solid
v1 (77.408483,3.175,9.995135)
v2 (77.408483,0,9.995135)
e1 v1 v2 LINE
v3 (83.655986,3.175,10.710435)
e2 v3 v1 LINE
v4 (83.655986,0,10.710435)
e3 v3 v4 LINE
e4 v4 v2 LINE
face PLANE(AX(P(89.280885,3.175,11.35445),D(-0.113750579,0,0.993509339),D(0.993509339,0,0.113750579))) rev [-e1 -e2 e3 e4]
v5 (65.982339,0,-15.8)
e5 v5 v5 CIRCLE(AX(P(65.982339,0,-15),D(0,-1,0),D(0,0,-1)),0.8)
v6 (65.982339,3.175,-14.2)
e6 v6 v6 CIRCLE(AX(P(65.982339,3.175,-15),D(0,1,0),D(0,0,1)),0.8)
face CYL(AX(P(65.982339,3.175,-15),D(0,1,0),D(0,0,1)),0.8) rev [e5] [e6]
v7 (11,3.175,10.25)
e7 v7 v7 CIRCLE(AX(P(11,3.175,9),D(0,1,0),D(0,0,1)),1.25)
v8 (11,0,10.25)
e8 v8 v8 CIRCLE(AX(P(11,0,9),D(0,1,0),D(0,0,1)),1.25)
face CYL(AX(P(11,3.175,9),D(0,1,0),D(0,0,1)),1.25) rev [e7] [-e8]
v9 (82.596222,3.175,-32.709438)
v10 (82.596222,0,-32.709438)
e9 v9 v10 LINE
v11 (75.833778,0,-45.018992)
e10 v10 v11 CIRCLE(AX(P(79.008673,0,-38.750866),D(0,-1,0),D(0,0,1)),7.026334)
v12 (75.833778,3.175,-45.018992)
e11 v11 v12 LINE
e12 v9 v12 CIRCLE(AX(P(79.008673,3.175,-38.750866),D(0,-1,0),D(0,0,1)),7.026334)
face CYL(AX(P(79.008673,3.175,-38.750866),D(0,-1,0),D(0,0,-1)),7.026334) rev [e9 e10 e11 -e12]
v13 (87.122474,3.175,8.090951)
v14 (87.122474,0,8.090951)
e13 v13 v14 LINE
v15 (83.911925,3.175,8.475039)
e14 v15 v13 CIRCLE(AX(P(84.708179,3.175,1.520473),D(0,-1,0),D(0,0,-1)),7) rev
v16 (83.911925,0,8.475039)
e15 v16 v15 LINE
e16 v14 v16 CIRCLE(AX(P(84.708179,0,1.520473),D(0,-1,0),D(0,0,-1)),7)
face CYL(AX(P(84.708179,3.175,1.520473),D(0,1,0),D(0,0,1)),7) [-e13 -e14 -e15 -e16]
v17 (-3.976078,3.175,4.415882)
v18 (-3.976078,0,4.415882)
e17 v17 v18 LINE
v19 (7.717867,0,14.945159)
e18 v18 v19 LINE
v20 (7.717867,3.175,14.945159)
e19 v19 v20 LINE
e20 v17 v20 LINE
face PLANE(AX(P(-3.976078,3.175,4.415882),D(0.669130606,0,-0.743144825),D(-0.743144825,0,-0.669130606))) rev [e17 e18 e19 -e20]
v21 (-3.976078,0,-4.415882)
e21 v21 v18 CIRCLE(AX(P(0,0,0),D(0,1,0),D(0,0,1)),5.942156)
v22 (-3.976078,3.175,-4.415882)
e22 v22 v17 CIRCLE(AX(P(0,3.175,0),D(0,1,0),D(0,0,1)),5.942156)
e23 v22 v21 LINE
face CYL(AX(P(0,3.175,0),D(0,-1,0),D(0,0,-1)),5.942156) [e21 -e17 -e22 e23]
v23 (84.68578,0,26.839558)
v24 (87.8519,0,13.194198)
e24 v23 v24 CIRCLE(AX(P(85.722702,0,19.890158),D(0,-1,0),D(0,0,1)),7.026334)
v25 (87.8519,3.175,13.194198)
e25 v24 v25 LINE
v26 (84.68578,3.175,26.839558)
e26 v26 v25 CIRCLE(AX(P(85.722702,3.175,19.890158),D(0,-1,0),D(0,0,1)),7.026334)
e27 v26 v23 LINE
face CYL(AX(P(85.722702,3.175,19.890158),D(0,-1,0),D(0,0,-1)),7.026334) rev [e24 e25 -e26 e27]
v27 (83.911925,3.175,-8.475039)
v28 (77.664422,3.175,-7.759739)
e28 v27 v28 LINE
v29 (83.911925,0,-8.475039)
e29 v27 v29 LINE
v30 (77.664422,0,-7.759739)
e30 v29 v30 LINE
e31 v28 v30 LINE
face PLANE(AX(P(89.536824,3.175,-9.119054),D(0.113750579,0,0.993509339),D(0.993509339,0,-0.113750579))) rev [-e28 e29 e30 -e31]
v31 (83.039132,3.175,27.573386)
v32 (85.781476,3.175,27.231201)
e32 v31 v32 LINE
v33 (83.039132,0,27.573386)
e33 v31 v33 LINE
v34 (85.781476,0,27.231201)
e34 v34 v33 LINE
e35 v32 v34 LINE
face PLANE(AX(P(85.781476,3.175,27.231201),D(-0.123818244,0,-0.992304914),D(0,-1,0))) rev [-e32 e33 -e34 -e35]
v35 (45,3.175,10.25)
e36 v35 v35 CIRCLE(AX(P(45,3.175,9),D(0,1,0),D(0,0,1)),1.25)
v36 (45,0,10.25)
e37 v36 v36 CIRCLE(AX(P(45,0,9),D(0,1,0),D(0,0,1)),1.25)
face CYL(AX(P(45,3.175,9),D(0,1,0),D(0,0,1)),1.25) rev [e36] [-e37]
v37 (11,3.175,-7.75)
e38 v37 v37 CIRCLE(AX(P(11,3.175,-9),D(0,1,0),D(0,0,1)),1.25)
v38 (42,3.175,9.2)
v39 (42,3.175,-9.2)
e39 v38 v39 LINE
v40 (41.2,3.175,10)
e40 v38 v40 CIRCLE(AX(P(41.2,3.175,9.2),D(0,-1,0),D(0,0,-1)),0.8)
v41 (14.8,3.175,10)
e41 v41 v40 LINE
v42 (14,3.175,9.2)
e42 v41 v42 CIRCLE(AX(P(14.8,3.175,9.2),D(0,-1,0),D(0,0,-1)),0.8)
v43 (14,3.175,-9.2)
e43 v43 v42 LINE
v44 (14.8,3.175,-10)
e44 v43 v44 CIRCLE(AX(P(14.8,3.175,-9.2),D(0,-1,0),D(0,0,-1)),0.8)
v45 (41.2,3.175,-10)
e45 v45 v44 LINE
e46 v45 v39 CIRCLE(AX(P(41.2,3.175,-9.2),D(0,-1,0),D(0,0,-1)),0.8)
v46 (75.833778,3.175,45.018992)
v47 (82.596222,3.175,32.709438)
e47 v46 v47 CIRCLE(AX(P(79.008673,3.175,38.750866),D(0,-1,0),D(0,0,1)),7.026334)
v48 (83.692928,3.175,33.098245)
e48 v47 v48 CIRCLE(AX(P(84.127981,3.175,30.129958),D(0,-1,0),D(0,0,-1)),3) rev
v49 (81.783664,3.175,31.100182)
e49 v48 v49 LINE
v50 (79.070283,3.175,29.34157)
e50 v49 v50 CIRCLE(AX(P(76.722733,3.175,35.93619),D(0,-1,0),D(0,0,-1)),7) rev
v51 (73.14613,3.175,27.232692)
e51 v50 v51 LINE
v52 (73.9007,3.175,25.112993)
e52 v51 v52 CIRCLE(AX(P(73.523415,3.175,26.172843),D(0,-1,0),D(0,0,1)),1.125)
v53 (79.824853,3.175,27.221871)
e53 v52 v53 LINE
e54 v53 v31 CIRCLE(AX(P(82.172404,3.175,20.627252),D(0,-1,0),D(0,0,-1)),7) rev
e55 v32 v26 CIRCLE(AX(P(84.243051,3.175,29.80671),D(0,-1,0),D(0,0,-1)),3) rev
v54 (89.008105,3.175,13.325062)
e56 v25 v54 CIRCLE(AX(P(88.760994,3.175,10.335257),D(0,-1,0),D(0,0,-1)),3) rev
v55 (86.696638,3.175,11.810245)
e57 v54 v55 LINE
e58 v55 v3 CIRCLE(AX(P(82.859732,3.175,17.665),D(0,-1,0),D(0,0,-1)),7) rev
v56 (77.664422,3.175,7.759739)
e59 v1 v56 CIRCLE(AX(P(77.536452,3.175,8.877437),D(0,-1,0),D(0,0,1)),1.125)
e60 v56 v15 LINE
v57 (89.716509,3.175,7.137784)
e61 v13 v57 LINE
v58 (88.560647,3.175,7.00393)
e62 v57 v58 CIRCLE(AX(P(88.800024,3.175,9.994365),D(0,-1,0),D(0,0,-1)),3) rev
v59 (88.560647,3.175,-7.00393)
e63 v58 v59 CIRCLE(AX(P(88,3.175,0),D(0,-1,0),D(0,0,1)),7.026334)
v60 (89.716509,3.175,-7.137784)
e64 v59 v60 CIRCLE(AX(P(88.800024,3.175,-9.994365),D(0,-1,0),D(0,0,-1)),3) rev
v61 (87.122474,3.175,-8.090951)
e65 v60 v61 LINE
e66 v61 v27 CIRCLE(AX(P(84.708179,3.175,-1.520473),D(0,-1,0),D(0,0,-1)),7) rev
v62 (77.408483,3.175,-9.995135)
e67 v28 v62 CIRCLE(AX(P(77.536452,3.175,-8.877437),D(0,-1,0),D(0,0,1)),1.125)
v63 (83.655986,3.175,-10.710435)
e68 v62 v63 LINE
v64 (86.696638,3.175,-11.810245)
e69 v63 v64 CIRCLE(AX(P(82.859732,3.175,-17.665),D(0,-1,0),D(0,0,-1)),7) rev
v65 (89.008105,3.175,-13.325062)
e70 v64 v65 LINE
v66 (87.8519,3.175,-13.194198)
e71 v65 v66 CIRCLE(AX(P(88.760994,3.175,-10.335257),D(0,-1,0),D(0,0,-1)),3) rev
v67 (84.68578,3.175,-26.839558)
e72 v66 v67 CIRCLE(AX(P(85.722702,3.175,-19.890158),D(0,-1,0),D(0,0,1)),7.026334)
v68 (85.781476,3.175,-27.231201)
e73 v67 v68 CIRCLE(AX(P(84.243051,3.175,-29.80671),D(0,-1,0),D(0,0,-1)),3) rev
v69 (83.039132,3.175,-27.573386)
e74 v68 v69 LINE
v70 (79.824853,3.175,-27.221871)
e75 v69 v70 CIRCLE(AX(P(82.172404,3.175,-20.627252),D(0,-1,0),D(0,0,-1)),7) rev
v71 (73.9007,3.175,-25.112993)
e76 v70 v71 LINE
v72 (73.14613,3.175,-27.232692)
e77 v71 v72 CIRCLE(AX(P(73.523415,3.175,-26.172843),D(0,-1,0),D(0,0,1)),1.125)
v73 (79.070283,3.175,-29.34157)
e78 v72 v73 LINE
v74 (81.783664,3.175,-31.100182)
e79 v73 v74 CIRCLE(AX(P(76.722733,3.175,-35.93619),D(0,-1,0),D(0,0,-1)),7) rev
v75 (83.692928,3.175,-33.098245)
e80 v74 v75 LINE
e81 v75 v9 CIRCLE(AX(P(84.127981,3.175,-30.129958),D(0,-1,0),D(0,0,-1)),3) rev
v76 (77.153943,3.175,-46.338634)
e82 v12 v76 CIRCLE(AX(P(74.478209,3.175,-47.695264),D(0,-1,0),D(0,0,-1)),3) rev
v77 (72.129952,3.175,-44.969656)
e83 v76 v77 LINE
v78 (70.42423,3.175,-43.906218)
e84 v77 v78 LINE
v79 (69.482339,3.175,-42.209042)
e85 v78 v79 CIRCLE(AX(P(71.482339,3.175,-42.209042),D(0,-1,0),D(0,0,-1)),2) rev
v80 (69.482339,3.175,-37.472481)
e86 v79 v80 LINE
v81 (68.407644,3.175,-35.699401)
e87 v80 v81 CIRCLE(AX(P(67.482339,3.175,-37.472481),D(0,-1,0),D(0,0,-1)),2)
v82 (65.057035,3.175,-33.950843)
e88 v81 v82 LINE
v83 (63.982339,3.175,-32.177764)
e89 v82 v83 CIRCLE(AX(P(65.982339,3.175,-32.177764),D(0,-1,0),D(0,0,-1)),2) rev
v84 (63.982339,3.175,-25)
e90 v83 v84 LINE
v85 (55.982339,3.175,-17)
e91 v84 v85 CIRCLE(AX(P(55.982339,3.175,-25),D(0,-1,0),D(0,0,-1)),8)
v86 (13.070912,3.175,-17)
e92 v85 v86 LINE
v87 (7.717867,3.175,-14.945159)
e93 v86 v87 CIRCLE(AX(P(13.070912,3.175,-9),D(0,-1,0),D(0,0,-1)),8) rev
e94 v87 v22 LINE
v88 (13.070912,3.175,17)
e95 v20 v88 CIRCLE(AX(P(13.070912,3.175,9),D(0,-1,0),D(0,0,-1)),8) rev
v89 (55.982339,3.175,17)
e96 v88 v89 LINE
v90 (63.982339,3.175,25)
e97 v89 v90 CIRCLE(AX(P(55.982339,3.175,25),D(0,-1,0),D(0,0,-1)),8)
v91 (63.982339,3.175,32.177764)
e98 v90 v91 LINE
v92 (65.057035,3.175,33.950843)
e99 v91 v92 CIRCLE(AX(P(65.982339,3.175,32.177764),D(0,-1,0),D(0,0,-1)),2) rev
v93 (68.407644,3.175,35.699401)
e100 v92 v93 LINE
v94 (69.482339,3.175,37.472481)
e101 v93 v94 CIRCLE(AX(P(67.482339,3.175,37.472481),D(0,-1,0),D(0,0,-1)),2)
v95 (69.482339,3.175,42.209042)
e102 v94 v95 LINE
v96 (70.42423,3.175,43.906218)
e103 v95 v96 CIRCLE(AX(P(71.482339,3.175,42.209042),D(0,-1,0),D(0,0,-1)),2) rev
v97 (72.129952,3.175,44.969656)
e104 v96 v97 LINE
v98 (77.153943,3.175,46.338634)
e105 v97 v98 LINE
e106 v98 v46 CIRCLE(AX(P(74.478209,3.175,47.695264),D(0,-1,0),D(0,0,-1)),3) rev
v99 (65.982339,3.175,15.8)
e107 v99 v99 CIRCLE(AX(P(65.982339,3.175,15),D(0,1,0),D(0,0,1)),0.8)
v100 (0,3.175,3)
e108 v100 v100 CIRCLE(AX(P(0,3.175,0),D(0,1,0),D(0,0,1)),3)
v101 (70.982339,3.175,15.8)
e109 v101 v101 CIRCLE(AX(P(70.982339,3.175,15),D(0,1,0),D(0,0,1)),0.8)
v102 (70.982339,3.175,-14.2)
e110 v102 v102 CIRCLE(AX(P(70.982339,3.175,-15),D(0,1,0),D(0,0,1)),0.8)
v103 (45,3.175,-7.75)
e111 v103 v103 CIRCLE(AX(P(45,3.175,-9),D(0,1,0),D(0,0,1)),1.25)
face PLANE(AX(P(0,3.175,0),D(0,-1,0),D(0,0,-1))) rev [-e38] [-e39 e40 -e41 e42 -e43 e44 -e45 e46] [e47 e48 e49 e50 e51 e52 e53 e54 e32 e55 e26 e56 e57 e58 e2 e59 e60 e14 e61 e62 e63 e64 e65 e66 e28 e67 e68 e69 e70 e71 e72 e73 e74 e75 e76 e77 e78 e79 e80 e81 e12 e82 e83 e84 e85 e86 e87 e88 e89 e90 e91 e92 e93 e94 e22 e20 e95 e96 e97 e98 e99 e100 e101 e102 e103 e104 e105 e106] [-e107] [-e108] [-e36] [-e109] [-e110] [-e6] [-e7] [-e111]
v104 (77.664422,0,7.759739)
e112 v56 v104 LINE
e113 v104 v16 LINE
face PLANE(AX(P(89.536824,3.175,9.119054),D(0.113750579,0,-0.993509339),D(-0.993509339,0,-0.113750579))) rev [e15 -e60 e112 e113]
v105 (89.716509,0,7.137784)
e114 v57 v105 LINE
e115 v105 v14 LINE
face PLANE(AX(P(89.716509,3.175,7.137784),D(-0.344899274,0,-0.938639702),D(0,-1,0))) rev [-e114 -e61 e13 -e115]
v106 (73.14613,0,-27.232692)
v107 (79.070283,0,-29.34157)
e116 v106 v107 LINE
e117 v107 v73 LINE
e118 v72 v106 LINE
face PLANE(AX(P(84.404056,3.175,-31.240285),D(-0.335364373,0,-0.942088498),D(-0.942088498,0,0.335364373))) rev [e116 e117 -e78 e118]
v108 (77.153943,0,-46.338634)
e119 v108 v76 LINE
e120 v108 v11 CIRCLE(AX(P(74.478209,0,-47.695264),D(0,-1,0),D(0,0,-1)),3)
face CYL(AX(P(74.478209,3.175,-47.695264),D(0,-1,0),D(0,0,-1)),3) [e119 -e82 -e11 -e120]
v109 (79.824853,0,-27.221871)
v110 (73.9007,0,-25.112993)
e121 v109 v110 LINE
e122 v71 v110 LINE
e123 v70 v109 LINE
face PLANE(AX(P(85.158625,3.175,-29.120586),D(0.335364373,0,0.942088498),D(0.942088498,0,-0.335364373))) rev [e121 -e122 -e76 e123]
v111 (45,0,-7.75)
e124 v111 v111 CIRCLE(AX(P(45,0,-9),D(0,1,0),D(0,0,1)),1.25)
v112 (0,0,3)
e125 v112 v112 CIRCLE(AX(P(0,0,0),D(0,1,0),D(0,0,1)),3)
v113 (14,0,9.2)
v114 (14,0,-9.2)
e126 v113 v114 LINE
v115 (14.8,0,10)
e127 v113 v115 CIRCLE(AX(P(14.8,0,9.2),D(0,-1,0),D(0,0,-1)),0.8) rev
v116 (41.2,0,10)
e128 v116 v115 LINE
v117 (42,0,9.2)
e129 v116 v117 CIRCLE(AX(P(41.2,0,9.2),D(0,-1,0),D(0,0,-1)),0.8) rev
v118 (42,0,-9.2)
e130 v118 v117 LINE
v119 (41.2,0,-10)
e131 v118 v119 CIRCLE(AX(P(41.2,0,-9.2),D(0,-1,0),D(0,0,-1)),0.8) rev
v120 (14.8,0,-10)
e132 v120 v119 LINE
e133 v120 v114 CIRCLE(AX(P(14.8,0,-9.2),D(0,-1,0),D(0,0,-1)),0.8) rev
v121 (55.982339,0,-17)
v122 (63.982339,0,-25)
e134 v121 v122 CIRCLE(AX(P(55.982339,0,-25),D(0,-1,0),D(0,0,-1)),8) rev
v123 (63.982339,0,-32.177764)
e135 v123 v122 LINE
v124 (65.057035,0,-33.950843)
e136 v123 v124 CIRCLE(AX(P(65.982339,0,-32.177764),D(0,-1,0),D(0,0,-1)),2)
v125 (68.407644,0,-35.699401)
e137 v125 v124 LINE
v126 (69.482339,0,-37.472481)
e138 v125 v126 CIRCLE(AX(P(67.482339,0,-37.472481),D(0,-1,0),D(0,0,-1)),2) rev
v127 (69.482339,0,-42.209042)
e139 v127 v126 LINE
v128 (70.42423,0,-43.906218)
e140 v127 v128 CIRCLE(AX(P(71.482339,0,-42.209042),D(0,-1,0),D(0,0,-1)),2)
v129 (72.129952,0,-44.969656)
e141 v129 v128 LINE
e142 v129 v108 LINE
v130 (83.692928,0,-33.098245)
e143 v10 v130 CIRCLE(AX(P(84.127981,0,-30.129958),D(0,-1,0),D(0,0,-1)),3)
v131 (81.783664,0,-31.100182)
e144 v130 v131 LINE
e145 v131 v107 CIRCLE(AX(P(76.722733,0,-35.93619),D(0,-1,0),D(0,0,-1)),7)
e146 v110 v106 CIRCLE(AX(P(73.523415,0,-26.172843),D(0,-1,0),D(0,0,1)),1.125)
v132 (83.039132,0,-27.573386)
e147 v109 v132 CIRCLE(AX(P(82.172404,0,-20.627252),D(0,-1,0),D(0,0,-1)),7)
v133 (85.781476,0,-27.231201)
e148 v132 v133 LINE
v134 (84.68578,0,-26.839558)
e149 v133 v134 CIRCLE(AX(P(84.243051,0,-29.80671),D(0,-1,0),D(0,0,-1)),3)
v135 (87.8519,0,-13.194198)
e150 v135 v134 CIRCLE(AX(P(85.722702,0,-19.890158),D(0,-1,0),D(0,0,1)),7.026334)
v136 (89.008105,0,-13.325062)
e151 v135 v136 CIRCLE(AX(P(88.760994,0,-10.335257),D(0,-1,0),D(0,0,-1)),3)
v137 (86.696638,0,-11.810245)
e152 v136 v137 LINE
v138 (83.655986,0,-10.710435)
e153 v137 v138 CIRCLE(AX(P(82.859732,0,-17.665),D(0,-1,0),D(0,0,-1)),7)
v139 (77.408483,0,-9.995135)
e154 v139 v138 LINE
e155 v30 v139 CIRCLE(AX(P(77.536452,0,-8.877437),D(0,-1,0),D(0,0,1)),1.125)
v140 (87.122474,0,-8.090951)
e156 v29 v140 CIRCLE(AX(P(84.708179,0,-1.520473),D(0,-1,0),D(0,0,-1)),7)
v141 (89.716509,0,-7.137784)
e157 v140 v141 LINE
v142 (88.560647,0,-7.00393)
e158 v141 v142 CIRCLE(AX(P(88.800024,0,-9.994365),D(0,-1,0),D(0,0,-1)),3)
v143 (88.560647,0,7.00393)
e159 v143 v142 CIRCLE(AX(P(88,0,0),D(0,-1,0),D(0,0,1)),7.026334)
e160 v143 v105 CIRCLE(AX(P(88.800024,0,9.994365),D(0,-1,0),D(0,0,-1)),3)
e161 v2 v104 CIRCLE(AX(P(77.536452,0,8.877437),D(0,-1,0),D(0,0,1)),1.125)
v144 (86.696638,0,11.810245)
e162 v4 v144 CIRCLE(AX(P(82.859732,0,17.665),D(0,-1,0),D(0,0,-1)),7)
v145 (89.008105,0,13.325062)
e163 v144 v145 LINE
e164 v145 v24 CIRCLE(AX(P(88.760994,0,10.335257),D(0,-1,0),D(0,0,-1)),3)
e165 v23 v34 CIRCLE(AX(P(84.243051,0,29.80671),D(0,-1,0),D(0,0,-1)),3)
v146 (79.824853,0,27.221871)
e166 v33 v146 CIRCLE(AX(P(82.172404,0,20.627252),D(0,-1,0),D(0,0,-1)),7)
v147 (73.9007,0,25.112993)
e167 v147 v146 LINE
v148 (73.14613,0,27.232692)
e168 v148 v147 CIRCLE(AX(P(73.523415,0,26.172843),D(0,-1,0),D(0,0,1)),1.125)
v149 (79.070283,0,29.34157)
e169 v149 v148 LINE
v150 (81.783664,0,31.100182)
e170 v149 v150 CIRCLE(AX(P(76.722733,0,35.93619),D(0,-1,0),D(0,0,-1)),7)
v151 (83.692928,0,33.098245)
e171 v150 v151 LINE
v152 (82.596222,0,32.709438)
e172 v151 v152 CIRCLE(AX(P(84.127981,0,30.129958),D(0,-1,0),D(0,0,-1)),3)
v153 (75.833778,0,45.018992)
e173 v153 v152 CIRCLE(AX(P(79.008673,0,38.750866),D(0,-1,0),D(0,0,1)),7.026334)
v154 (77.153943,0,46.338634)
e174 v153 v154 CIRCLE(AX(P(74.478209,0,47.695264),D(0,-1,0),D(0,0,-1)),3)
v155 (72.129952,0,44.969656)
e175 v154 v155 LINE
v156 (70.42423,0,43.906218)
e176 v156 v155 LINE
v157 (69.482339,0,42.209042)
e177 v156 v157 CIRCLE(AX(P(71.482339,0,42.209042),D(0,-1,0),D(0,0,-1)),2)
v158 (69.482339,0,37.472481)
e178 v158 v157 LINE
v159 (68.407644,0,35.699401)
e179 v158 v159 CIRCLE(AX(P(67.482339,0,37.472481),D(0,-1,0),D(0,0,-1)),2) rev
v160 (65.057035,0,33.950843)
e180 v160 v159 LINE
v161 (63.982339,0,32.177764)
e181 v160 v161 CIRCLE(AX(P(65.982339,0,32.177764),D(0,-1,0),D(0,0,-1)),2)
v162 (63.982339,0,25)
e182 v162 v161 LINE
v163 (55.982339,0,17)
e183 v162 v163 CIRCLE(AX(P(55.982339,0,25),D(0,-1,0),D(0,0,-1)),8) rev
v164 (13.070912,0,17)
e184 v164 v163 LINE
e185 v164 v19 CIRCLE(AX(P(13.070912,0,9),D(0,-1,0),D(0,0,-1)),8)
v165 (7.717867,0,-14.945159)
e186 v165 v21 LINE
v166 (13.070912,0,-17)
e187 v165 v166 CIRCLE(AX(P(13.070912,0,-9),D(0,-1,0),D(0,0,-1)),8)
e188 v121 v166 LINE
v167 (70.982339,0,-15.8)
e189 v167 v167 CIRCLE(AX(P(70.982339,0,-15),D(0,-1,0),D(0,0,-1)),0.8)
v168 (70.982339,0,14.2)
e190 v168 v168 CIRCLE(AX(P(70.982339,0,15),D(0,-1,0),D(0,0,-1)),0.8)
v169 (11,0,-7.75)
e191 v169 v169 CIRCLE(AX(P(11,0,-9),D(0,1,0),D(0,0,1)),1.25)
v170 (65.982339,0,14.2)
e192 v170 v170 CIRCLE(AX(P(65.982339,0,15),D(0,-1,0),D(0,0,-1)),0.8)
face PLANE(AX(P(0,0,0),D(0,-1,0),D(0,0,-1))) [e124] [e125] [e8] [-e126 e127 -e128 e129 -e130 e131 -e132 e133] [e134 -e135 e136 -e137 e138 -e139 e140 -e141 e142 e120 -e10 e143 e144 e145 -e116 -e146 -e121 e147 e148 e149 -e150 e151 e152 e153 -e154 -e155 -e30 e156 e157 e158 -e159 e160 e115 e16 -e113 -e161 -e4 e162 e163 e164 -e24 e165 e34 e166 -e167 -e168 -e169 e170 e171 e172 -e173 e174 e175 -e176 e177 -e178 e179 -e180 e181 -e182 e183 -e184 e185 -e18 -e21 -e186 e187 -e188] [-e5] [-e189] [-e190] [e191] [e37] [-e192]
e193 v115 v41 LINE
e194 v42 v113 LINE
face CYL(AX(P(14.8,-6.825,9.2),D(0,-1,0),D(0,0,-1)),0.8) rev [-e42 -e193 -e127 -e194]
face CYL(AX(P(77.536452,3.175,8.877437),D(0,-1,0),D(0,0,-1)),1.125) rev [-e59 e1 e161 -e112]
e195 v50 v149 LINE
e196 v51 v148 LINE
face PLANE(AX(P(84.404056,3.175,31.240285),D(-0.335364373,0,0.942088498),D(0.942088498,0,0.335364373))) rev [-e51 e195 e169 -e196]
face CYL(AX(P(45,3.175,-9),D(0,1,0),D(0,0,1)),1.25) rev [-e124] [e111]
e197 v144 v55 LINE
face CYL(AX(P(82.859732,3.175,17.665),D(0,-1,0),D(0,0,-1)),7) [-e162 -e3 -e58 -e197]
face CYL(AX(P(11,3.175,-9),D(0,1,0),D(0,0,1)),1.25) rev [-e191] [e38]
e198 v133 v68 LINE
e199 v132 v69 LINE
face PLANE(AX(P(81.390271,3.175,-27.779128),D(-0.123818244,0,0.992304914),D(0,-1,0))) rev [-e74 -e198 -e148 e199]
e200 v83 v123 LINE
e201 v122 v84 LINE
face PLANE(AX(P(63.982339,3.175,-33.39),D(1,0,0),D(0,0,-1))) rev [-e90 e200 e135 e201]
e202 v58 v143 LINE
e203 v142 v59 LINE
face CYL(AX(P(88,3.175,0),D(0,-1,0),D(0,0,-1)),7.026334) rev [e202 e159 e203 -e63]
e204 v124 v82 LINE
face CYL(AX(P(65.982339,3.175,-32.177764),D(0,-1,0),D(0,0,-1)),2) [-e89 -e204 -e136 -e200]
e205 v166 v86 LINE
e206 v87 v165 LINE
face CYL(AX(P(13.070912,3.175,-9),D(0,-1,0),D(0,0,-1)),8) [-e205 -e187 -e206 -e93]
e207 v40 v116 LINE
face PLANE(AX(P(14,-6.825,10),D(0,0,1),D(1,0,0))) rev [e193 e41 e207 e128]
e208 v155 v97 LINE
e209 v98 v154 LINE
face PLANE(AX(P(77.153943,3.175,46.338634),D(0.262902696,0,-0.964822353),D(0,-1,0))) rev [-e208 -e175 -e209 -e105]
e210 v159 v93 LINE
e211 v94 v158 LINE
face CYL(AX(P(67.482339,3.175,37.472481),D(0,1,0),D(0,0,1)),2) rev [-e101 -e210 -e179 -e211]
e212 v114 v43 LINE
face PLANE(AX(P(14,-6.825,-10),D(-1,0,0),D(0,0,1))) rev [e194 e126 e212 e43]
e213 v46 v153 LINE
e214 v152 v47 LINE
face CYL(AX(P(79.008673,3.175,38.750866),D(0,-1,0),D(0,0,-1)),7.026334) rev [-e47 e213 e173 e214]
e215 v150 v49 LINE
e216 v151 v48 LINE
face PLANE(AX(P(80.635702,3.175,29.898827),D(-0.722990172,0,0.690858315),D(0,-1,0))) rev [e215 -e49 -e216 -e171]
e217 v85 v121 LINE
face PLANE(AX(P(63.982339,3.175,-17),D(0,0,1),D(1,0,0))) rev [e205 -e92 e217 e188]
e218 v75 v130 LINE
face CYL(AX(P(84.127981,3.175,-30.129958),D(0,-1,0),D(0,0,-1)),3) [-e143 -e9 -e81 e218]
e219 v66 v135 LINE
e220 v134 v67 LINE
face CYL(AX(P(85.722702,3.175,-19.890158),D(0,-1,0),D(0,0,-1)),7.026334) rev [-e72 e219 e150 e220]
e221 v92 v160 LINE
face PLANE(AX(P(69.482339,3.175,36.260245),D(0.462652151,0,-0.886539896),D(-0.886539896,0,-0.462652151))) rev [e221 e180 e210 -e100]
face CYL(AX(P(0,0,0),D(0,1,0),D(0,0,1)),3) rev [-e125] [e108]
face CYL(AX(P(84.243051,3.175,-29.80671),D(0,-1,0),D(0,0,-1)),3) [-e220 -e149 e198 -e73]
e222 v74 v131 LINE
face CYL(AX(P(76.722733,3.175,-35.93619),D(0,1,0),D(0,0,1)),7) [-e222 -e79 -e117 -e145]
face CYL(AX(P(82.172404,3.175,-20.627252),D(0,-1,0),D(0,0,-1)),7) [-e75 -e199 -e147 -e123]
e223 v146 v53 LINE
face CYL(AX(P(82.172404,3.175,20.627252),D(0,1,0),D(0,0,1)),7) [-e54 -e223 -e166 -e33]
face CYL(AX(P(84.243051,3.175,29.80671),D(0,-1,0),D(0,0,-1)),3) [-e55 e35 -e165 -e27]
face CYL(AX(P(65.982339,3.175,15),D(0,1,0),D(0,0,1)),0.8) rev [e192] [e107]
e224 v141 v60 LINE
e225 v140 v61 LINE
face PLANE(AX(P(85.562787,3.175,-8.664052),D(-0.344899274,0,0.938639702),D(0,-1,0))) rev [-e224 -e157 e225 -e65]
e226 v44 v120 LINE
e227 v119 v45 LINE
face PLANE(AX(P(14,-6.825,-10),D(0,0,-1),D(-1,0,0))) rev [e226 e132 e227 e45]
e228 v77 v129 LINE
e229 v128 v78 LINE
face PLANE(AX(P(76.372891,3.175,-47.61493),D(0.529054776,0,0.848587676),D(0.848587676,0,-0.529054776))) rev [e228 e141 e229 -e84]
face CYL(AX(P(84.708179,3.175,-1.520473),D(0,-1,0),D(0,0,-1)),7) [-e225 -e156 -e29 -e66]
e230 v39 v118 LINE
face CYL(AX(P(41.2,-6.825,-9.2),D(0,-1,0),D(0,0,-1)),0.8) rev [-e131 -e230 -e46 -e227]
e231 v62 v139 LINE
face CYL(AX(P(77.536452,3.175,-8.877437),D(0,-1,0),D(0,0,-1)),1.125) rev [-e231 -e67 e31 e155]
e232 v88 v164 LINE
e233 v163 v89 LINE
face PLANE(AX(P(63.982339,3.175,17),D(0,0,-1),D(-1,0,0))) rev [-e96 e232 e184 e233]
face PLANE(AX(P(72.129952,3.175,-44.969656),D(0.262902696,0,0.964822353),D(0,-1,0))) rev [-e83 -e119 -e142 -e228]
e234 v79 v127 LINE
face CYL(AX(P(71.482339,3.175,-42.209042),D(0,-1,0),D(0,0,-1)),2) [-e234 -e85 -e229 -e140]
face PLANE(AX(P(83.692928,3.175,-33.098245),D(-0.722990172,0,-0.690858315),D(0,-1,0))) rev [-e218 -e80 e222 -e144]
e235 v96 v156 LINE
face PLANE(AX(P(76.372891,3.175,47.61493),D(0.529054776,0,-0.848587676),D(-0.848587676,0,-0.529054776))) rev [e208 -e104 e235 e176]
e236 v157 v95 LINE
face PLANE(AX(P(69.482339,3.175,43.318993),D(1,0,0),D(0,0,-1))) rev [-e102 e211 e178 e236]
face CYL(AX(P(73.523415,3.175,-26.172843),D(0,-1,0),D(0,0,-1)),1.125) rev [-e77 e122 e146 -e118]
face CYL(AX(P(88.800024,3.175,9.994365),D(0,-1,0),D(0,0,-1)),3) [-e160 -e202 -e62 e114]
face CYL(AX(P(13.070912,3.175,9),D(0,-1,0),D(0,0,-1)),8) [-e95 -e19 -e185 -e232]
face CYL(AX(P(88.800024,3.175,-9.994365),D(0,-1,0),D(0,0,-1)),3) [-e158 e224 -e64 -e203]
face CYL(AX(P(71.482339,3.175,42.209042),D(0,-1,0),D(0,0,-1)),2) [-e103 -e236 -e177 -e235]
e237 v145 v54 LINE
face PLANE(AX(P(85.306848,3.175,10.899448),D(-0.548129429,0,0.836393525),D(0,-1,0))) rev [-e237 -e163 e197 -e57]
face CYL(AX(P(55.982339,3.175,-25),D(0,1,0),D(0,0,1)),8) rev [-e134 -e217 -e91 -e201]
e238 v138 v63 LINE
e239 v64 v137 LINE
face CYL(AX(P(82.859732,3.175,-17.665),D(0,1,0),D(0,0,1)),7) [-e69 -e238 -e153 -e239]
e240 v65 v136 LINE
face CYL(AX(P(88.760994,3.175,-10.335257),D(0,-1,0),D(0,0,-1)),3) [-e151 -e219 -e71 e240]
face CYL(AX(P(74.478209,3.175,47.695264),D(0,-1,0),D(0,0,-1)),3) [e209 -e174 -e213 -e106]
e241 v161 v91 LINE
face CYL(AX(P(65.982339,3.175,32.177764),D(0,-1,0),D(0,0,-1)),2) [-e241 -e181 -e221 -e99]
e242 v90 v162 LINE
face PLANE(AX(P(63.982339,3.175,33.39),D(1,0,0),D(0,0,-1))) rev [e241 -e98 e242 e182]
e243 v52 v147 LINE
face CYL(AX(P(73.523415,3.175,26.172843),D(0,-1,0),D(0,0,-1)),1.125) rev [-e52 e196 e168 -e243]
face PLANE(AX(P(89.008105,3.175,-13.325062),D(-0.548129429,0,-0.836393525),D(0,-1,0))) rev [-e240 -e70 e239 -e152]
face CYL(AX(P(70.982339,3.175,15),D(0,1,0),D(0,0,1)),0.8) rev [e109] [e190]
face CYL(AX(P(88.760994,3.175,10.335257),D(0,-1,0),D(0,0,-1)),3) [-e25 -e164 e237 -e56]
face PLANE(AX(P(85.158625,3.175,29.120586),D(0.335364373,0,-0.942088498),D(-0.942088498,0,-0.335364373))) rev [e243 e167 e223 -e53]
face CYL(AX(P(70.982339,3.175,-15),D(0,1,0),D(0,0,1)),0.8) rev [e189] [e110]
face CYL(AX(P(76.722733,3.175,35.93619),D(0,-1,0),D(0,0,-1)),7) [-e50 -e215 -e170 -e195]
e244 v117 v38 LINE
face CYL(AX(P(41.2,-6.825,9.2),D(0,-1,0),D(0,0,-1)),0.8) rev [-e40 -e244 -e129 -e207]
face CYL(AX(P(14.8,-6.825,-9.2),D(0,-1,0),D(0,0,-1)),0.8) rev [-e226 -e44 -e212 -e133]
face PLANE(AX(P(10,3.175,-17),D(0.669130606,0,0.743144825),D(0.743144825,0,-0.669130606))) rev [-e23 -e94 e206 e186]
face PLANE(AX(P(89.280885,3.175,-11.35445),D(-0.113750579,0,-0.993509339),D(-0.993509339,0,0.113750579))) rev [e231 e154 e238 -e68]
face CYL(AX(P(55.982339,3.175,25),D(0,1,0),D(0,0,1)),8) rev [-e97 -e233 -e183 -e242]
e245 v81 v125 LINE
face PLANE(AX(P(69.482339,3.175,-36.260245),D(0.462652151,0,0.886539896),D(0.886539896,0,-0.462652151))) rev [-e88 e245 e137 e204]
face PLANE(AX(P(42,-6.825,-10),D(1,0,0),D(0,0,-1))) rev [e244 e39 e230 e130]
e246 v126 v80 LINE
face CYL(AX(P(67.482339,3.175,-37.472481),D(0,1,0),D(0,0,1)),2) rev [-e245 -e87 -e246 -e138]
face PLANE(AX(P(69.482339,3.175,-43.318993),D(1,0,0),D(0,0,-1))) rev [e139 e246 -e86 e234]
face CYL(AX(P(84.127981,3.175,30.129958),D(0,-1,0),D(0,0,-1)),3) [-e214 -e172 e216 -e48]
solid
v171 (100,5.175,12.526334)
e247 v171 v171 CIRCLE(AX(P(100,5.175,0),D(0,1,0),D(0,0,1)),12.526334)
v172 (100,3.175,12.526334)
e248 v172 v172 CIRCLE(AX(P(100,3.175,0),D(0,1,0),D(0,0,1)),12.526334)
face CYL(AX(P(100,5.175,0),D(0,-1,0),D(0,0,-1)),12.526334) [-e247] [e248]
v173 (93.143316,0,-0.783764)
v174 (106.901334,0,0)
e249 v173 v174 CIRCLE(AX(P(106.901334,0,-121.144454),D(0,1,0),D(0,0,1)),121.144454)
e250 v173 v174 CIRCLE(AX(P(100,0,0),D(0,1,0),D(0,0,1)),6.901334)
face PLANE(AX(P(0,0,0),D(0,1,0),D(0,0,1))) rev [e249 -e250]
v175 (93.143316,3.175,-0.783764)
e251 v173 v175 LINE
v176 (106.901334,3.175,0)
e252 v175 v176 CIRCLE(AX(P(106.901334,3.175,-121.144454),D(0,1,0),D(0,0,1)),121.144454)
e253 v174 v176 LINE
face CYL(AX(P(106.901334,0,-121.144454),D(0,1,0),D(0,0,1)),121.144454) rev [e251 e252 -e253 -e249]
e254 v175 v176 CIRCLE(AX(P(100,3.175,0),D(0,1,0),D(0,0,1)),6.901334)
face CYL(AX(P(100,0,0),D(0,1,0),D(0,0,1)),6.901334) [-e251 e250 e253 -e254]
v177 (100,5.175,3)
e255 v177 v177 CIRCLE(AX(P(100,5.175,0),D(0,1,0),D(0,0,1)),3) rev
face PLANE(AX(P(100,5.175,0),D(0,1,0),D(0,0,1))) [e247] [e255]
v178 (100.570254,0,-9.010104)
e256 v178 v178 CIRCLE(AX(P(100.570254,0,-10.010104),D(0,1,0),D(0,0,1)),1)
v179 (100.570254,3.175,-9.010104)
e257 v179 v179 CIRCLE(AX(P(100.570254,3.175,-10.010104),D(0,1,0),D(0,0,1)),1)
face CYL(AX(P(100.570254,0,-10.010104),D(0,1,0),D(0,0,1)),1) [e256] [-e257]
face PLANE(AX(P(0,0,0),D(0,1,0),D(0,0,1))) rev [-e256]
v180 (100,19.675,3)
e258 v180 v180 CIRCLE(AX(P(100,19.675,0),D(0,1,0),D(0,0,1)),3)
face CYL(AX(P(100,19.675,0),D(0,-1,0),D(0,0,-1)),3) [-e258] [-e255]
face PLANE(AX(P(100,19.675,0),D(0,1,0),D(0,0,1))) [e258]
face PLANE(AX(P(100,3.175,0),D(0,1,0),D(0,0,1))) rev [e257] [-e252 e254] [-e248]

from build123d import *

# Parameters (mm, degrees)
SKETCH1_R                      = 2
BASE_BOSS_EXTRUDE1_DEPTH       = 3.175
SKETCH4_R                      = 12.526333531
BOSS_EXTRUDE2_DEPTH            = 2
SKETCH4_3_R                    = 1
BOSS_EXTRUDE3_DEPTH            = 3.175
BOSS_EXTRUDE4_START            = -2
SKETCH6_R                      = 3
BOSS_EXTRUDE4_DEPTH            = 16.5
SKETCH7_W                      = 28
SKETCH7_H                      = 20
RECTANGLE_CUT_EXTRUDE1_DEPTH   = 10
SKETCH3_W                      = 1.25
SKETCH3_H                      = 3.175
M3X0_5_TAPPED_HOLE1_AT_2_COUNT = 2
M3X0_5_TAPPED_HOLE1_AT_2_PITCH = 34
M3X0_5_TAPPED_HOLE1_AT_3_COUNT = 2
M3X0_5_TAPPED_HOLE1_AT_3_PITCH = 18
M3X0_5_TAPPED_HOLE1_AT_4_COUNT = 2
M3X0_5_TAPPED_HOLE1_AT_4_PITCH = 38.470768123
CHAMFER1_SIZE                  = 4
CHAMFER2_SIZE                  = 4
CHAMFER3_SIZE                  = 5
CHAMFER4_SIZE                  = 5
FILLET9_R                      = 3
FILLET10_R                     = 7
FILLET6_R                      = 2
FILLET7_R                      = 0.8
SKETCH8_R                      = 3
CUT_EXTRUDE1_DEPTH             = 123.807551697
FILLET1_R                      = 8
M2_TAPPED_HOLE1_AT_2_COUNT     = 2
M2_TAPPED_HOLE1_AT_2_PITCH     = 30
M2_TAPPED_HOLE1_AT_3_COUNT     = 2
M2_TAPPED_HOLE1_AT_3_PITCH     = 30.413812651
M2_TAPPED_HOLE1_AT_4_COUNT     = 2
M2_TAPPED_HOLE1_AT_4_PITCH     = 5


with BuildPart() as part:
    # Sketch1 → Base Boss-Extrude1 (new body)
    with BuildSketch(Plane(origin=(0, 0, 0), x_dir=(1, 0, 0), z_dir=(0, 1, 0))):
        with BuildLine():
            Line((84.404055553, -31.240284988), (73.146130481, -27.232692294))
            ThreePointArc((73.146130481, -27.232692294), (72.463565841, -25.795557815), (73.90070032, -25.112993174))
            Line((73.90070032, -25.112993174), (85.158625392, -29.120585869))
            ThreePointArc((85.158625392, -29.120585869), (85.527078047, -28.019973605), (85.881306759, -26.914701361))
            ThreePointArc((85.881306759, -26.914701361), (78.878198486, -18.302034453), (88.95836429, -13.653183615))
            ThreePointArc((88.95836429, -13.653183615), (89.127036062, -12.504856768), (89.280885186, -11.354450248))
            Line((89.280885186, -11.354450248), (77.408482838, -9.995134754))
            ThreePointArc((77.408482838, -9.995134754), (76.418754233, -8.749467347), (77.66442164, -7.759738742))
            Line((77.66442164, -7.759738742), (89.536823988, -9.119054237))
            ThreePointArc((89.536823988, -9.119054237), (89.646976318, -7.963644708), (89.742219529, -6.806910753))
            ThreePointArc((89.742219529, -6.806910753), (80.973666469, 0), (89.742219529, 6.806910753))
            ThreePointArc((89.742219529, 6.806910753), (89.646976318, 7.963644708), (89.536823988, 9.119054237))
            Line((89.536823988, 9.119054237), (77.66442164, 7.759738742))
            ThreePointArc((77.66442164, 7.759738742), (76.418754233, 8.749467347), (77.408482838, 9.995134754))
            Line((77.408482838, 9.995134754), (89.280885186, 11.354450248))
            ThreePointArc((89.280885186, 11.354450248), (89.127036062, 12.504856768), (88.95836429, 13.653183615))
            ThreePointArc((88.95836429, 13.653183615), (78.878198486, 18.302034453), (85.881306759, 26.914701361))
            ThreePointArc((85.881306759, 26.914701361), (85.527078047, 28.019973605), (85.158625392, 29.120585869))
            Line((85.158625392, 29.120585869), (73.90070032, 25.112993174))
            ThreePointArc((73.90070032, 25.112993174), (72.463565841, 25.795557815), (73.146130481, 27.232692294))
            Line((73.146130481, 27.232692294), (84.404055553, 31.240284988))
            ThreePointArc((84.404055553, 31.240284988), (83.99416771, 32.326147167), (83.570310863, 33.406633208))
            ThreePointArc((83.570310863, 33.406633208), (72.700249204, 35.656814597), (77.57545438, 45.629473784))
            ThreePointArc((77.57545438, 45.629473784), (76.980573902, 46.626078987), (76.372890845, 47.614929843))
            Line((76.372890845, 47.614929843), (69.482339398, 43.318992893))
            Line((69.482339398, 43.318992893), (69.482339398, 36.260244959))
            Line((69.482339398, 36.260244959), (63.982339398, 33.389999814))
            Line((63.982339398, 33.389999814), (63.982339398, 17))
            Line((63.982339398, 17), (10, 17))
            Line((10, 17), (-3.976078427, 4.415882461))
            ThreePointArc((-3.976078427, 4.415882461), (-5.94215597, 0), (-3.976078427, -4.415882461))
            Line((-3.976078427, -4.415882461), (10, -17))
            Line((10, -17), (63.982339398, -17))
            Line((63.982339398, -17), (63.982339398, -33.389999814))
            Line((63.982339398, -33.389999814), (69.482339398, -36.260244959))
            Line((69.482339398, -36.260244959), (69.482339398, -43.318992893))
            Line((69.482339398, -43.318992893), (76.372890845, -47.614929843))
            ThreePointArc((76.372890845, -47.614929843), (76.980573902, -46.626078987), (77.57545438, -45.629473784))
            ThreePointArc((77.57545438, -45.629473784), (72.700249204, -35.656814597), (83.570310863, -33.406633208))
            ThreePointArc((83.570310863, -33.406633208), (83.99416771, -32.326147167), (84.404055553, -31.240284988))
        make_face()
        with Locations(Location((0, 0, 0), (0, 0, 270))):
            Circle(SKETCH1_R, mode=Mode.SUBTRACT)
    extrude(amount=BASE_BOSS_EXTRUDE1_DEPTH)

    # Sketch7 → Rectangle Cut-Extrude1 (cut)
    with BuildSketch(Plane(origin=(0, 3.175, 0), x_dir=(1, 0, 0), z_dir=(0, 1, 0))):
        with Locations((28, 0)):
            Rectangle(SKETCH7_W, SKETCH7_H)
    extrude(amount=-RECTANGLE_CUT_EXTRUDE1_DEPTH, mode=Mode.SUBTRACT)

    # Sketch3 → M3x0.5 Tapped Hole1 (revolve, cut)
    with BuildSketch(Plane(origin=(45, 3.175, -9), x_dir=(0, 0, 1), z_dir=(1, 0, 0))):
        with Locations((0.625, 1.5875)):
            Rectangle(SKETCH3_W, SKETCH3_H)
    m3x0_5_tapped_hole1 = revolve(axis=Axis((45, 9.525, -9), (0, -1, 0)), mode=Mode.SUBTRACT)

    # M3x0.5 Tapped Hole1 at 2: M3x0.5 Tapped Hole1 ×2
    with Locations(*[(-i * M3X0_5_TAPPED_HOLE1_AT_2_PITCH, 0, 0) for i in range(1, M3X0_5_TAPPED_HOLE1_AT_2_COUNT)]):
        add(m3x0_5_tapped_hole1, mode=Mode.SUBTRACT)

    # M3x0.5 Tapped Hole1 at 3: M3x0.5 Tapped Hole1 ×2
    with Locations(*[(0, 0, i * M3X0_5_TAPPED_HOLE1_AT_3_PITCH) for i in range(1, M3X0_5_TAPPED_HOLE1_AT_3_COUNT)]):
        add(m3x0_5_tapped_hole1, mode=Mode.SUBTRACT)

    # M3x0.5 Tapped Hole1 at 4: M3x0.5 Tapped Hole1 ×2
    with Locations(*[Vector(-0.88378791634706, 0, 0.4678877204190361) * (i * M3X0_5_TAPPED_HOLE1_AT_4_PITCH) for i in range(1, M3X0_5_TAPPED_HOLE1_AT_4_COUNT)]):
        add(m3x0_5_tapped_hole1, mode=Mode.SUBTRACT)

    # Chamfer1
    # the kernel refuses this chamfer: 4, 2 mm, written as the material it takes off along each edge
    with BuildSketch(Plane(origin=(84.404055553, -10.35888597, -31.240284988), x_dir=(-0.357458112725079, 0, -0.9339291716436663), z_dir=(0, 1, 0))) as chamfer1_piece_1:
        with BuildLine():
            Line((1.989401847, 0), (CHAMFER1_SIZE * 0.0235506055191, CHAMFER1_SIZE * 0.999722646027))
            Line((CHAMFER1_SIZE * 0.0235506055191, CHAMFER1_SIZE * 0.999722646027), (0, 0))
            ThreePointArc((0, 0), (1.028937008, -0.005490489), (1.989401847, 0))
        make_face()
    extrude(amount=23.89277194, mode=Mode.SUBTRACT)
    with BuildSketch(Plane(origin=(89.280885186, -10.35888597, -11.354450248), x_dir=(-0.993509338580465, 0, 0.1137505786948226), z_dir=(0, 1, 0)), Plane(origin=(89.536823988, -10.35888597, 9.119054237), x_dir=(-0.9935093385804683, 0, -0.1137505786947941), z_dir=(0, 1, 0)), Plane(origin=(85.158625392, -10.35888597, 29.120585869), x_dir=(-0.9420884976800207, 0, -0.3353643727932379), z_dir=(0, 1, 0))) as chamfer1_piece_2:
        with BuildLine():
            Line((CHAMFER1_SIZE, 0), (0.046851618, -1.988850078))
            ThreePointArc((0.046851618, -1.988850078), (0.018743123, -1.028780933), (0, 0))
            Line((0, 0), (CHAMFER1_SIZE, 0))
        make_face()
    extrude(amount=23.89277194, mode=Mode.SUBTRACT)

    # Chamfer2
    # the kernel refuses this chamfer: 4, 2 mm, written as the material it takes off along each edge
    with BuildSketch(Plane(origin=(85.158625392, -10.35888597, -29.120585869), x_dir=(-0.9420884976800226, 0, 0.3353643727932324), z_dir=(0, 1, 0)), Plane(origin=(89.536823988, -10.35888597, -9.119054237), x_dir=(-0.9935093385804687, 0, 0.1137505786947902), z_dir=(0, 1, 0)), Plane(origin=(89.280885186, -10.35888597, 11.354450248), x_dir=(-0.9935093385804648, 0, -0.11375057869482483), z_dir=(0, 1, 0)), Plane(origin=(84.404055553, -10.35888597, 31.240284988), x_dir=(-0.9420884976800115, 0, -0.33536437279326364), z_dir=(0, 1, 0))) as chamfer2_piece_1:
        with BuildLine():
            Line((CHAMFER2_SIZE, 0), (0.046851618, 1.988850078))
            ThreePointArc((0.046851618, 1.988850078), (0.018743123, 1.028780933), (0, 0))
            Line((0, 0), (CHAMFER2_SIZE, 0))
        make_face()
    extrude(amount=23.89277194, mode=Mode.SUBTRACT)

    # Chamfer3
    # the kernel refuses this chamfer: 5, 1.5 mm, written as the material it takes off along each edge
    with BuildSketch(Plane(origin=(76.372890845, -12.979708339, 47.614929843), x_dir=(-0.8485876760573847, 0, -0.5290547760331883), z_dir=(0, 1, 0))) as chamfer3_piece_1:
        with BuildLine():
            Line((CHAMFER3_SIZE, 0), (0.012438743, -1.496268377))
            ThreePointArc((0.012438743, -1.496268377), (0.003346069, -0.776067792), (0, 0))
            Line((0, 0), (CHAMFER3_SIZE, 0))
        make_face()
    extrude(amount=29.134416678, mode=Mode.SUBTRACT)

    # Chamfer4
    # the kernel refuses this chamfer: 5, 1.5 mm, written as the material it takes off along each edge
    with BuildSketch(Plane(origin=(76.372890845, -12.979708339, -47.614929843), x_dir=(-0.8485876760573731, 0, 0.5290547760332069), z_dir=(0, 1, 0))) as chamfer4_piece_1:
        with BuildLine():
            Line((CHAMFER4_SIZE, 0), (0.012438743, 1.496268377))
            ThreePointArc((0.012438743, 1.496268377), (0.003346069, 0.776067792), (0, 0))
            Line((0, 0), (CHAMFER4_SIZE, 0))
        make_face()
    extrude(amount=29.134416678, mode=Mode.SUBTRACT)

    # Fillet9
    # the kernel refuses this fillet: 3 mm, written as the material it takes off along each edge
    with BuildSketch(Plane(origin=(77.57545438, -4.613921253, 45.629473784), x_dir=(-0.9437070419178525, 0, -0.33078243459206924), z_dir=(0, 1, 0))) as fillet9_piece_1:
        with BuildLine():
            CenterArc((2.239565276, 2.974015222), FILLET9_R, 226.201834193, 36.251580599)
            Line((0.163205072, 0.808668067), (0.121677868, 0.765361124))
            ThreePointArc((0.121677868, 0.765361124), (0.021861793, 0.416390887), (-0.058867954, 0.011600172))
            Line((-0.058867954, 0.011600172), (0.007879936, -0.059480304))
            ThreePointArc((0.007879936, -0.059480304), (0.922784251, 0.000859239), (1.837688566, -0.059480304))
            Line((1.837688566, -0.059480304), (1.845568501, 0))
        make_face()
    extrude(amount=12.402842505, mode=Mode.SUBTRACT)
    with BuildSketch(Plane(origin=(83.570310863, -2.994713801, 33.406633208), x_dir=(0.3694721758404633, 0, -0.929241793765064), z_dir=(0, 1, 0)), Plane(origin=(88.95836429, -2.994713801, 13.653183615), x_dir=(0.14987939691227342, 0, -0.9887042866202276), z_dir=(0, 1, 0)), Plane(origin=(89.742219529, -2.994713801, -6.806910753), x_dir=(-0.07747065647813188, 0, -0.9969946325757462), z_dir=(0, 1, 0)), Plane(origin=(85.881306759, -2.994713801, -26.914701361), x_dir=(-0.30081107841240035, 0, -0.9536837500473461), z_dir=(0, 1, 0))) as fillet9_piece_2:
        with BuildLine():
            CenterArc((3.250866962, 0.69242963), FILLET9_R, 170.980179681, 22.364577563)
            Line((0.287964463, 1.162758009), (0.228706413, 1.172164577))
            ThreePointArc((0.228706413, 1.172164577), (0.110566007, 0.589654747), (-0.056799034, 0.019335712))
            Line((-0.056799034, 0.019335712), (-0.000110623, -0.059999898))
            ThreePointArc((-0.000110623, -0.059999898), (0.165935176, -0.060152969), (0.27349042, -0.013848593))
            Line((0.27349042, -0.013848593), (0.331870352, 0))
        make_face()
    extrude(amount=9.164427603, mode=Mode.SUBTRACT)
    with BuildSketch(Plane(origin=(85.881306759, -2.994713801, 26.914701361), x_dir=(-0.9980305287629706, 0, -0.0627300857412545), z_dir=(0, 1, 0)), Plane(origin=(89.742219529, -2.994713801, 6.806910753), x_dir=(-0.9863816449930947, 0, 0.16447264338094886), z_dir=(0, 1, 0)), Plane(origin=(88.95836429, -2.994713801, -13.653183615), x_dir=(-0.9236808267675535, 0, 0.38316279864048475), z_dir=(0, 1, 0)), Plane(origin=(83.570310863, -2.994713801, -33.406633208), x_dir=(-0.8131732663286447, 0, 0.582021682524288), z_dir=(0, 1, 0))) as fillet9_piece_3:
        with BuildLine():
            CenterArc((1.453613244, 2.989080683), FILLET9_R, 242.745448438, 22.364577563)
            Line((0.079779634, 0.322138387), (0.052302961, 0.268799541))
            ThreePointArc((0.052302961, 0.268799541), (-0.018499191, 0.175529605), (-0.058267018, 0.014316235))
            Line((-0.058267018, 0.014316235), (0.005114554, -0.059781614))
            ThreePointArc((0.005114554, -0.059781614), (0.59894276, -0.034425746), (1.192770966, -0.059781614))
            Line((1.192770966, -0.059781614), (1.197885521, 0))
        make_face()
    extrude(amount=9.164427603, mode=Mode.SUBTRACT)
    with BuildSketch(Plane(origin=(77.57545438, -4.613921253, -45.629473784), x_dir=(-0.5109392993386291, 0, -0.859616793921193), z_dir=(0, 1, 0))) as fillet9_piece_4:
        with BuildLine():
            CenterArc((3.358292449, 1.606950837), FILLET9_R, 176.136441891, 36.251580599)
            Line((0.365110439, 1.809092994), (0.305246798, 1.813135837))
            ThreePointArc((0.305246798, 1.813135837), (0.183397476, 0.904376513), (-0.056745851, 0.019491239))
            Line((-0.056745851, 0.019491239), (-0.000274991, -0.05999937))
            ThreePointArc((-0.000274991, -0.05999937), (0.412486345, -0.060945255), (0.774306294, -0.032139017))
            Line((0.774306294, -0.032139017), (0.824972689, 0))
        make_face()
    extrude(amount=12.402842505, mode=Mode.SUBTRACT)

    # Fillet10
    fillet10_edges = [part.edges().sort_by_distance(p)[0] for p in [
        (81.390271401, 1.5875, 27.779128377),
        (85.562786634, 1.5875, 8.664051922),
        (85.306847831, 1.5875, -10.899447934),
        (80.635701563, 1.5875, -29.898827497),
        (80.635701563, 1.5875, 29.898827497),
        (85.306847831, 1.5875, 10.899447934),
        (85.562786634, 1.5875, -8.664051922),
        (81.390271401, 1.5875, -27.779128377),
    ]]
    fillet(fillet10_edges, radius=FILLET10_R)

    # Fillet6
    fillet6_edges = [part.edges().sort_by_distance(p)[0] for p in [
        (69.482339398, 1.5875, 43.318992893),
        (69.482339398, 1.5875, 36.260244959),
        (63.982339398, 1.5875, 33.389999814),
        (63.982339398, 1.5875, -33.389999814),
        (69.482339398, 1.5875, -36.260244959),
        (69.482339398, 1.5875, -43.318992893),
    ]]
    fillet(fillet6_edges, radius=FILLET6_R)

    # Fillet7
    fillet7_edges = [part.edges().sort_by_distance(p)[0] for p in [
        (14, 1.5875, 10),
        (14, 1.5875, -10),
        (42, 1.5875, -10),
        (42, 1.5875, 10),
    ]]
    fillet(fillet7_edges, radius=FILLET7_R)

    # Sketch8 → Cut-Extrude1 (cut, through all)
    with BuildSketch(Plane(origin=(0, 3.175, 0), x_dir=(1, 0, 0), z_dir=(0, 1, 0))):
        with Locations(Location((0, 0, 0), (0, 0, 270))):
            Circle(SKETCH8_R)
    extrude(amount=-CUT_EXTRUDE1_DEPTH, mode=Mode.SUBTRACT)

    # Fillet1
    fillet1_edges = [part.edges().sort_by_distance(p)[0] for p in [
        (63.982339398, 1.5875, 17),
        (10, 1.5875, 17),
        (10, 1.5875, -17),
        (63.982339398, 1.5875, -17),
    ]]
    fillet(fillet1_edges, radius=FILLET1_R)

    # Sketch17 → M2 Tapped Hole1 (revolve, cut)
    with BuildSketch(Plane(origin=(70.982339398, 3.175, 15), x_dir=(0, 0, 1), z_dir=(1, 0, 0))):
        Polygon((0, 0), (0, 6.480688495), (0.8, 6), (0.8, 0), align=None)
    m2_tapped_hole1 = revolve(axis=Axis((70.982339398, 9.525, 15), (0, -1, 0)), mode=Mode.SUBTRACT)

    # M2 Tapped Hole1 at 2: M2 Tapped Hole1 ×2
    with Locations(*[(0, 0, -i * M2_TAPPED_HOLE1_AT_2_PITCH) for i in range(1, M2_TAPPED_HOLE1_AT_2_COUNT)]):
        add(m2_tapped_hole1, mode=Mode.SUBTRACT)

    # M2 Tapped Hole1 at 3: M2 Tapped Hole1 ×2
    with Locations(*[Vector(-0.1643989873053573, 0, -0.9863939238321437) * (i * M2_TAPPED_HOLE1_AT_3_PITCH) for i in range(1, M2_TAPPED_HOLE1_AT_3_COUNT)]):
        add(m2_tapped_hole1, mode=Mode.SUBTRACT)

    # M2 Tapped Hole1 at 4: M2 Tapped Hole1 ×2
    with Locations(*[(-i * M2_TAPPED_HOLE1_AT_4_PITCH, 0, 0) for i in range(1, M2_TAPPED_HOLE1_AT_4_COUNT)]):
        add(m2_tapped_hole1, mode=Mode.SUBTRACT)


with BuildPart() as body_2:
    # Sketch4 → Boss-Extrude2 (new body)
    with BuildSketch(Plane(origin=(0, 3.175, 0), x_dir=(1, 0, 0), z_dir=(0, 1, 0))):
        with Locations(Location((100, 0, 0), (0, 0, 270))):
            Circle(SKETCH4_R)
    extrude(amount=BOSS_EXTRUDE2_DEPTH)

    # Sketch4<3> → Boss-Extrude3 (add)
    with BuildSketch(Plane(origin=(0, 3.175, 0), x_dir=(1, 0, 0), z_dir=(0, 1, 0))):
        with BuildLine():
            ThreePointArc((93.143315787, 0.78376406), (99.607482592, -6.890162159), (106.901333531, 0))
            ThreePointArc((106.901333531, 0), (100.011171371, 0.196099731), (93.143315787, 0.78376406))
        make_face()
        with Locations(Location((100.570253624, 10.010103639, 0), (0, 0, 270))):
            Circle(SKETCH4_3_R)
    extrude(amount=-BOSS_EXTRUDE3_DEPTH)

    # Sketch6 → Boss-Extrude4 (add)
    with BuildSketch(Plane(origin=(0, 5.175, 0), x_dir=(1, 0, 0), z_dir=(0, 1, 0)).offset(BOSS_EXTRUDE4_START)):
        with Locations(Location((100, 0, 0), (0, 0, 270))):
            Circle(SKETCH6_R)
    extrude(amount=BOSS_EXTRUDE4_DEPTH)


solid = Compound([part.part, body_2.part])
